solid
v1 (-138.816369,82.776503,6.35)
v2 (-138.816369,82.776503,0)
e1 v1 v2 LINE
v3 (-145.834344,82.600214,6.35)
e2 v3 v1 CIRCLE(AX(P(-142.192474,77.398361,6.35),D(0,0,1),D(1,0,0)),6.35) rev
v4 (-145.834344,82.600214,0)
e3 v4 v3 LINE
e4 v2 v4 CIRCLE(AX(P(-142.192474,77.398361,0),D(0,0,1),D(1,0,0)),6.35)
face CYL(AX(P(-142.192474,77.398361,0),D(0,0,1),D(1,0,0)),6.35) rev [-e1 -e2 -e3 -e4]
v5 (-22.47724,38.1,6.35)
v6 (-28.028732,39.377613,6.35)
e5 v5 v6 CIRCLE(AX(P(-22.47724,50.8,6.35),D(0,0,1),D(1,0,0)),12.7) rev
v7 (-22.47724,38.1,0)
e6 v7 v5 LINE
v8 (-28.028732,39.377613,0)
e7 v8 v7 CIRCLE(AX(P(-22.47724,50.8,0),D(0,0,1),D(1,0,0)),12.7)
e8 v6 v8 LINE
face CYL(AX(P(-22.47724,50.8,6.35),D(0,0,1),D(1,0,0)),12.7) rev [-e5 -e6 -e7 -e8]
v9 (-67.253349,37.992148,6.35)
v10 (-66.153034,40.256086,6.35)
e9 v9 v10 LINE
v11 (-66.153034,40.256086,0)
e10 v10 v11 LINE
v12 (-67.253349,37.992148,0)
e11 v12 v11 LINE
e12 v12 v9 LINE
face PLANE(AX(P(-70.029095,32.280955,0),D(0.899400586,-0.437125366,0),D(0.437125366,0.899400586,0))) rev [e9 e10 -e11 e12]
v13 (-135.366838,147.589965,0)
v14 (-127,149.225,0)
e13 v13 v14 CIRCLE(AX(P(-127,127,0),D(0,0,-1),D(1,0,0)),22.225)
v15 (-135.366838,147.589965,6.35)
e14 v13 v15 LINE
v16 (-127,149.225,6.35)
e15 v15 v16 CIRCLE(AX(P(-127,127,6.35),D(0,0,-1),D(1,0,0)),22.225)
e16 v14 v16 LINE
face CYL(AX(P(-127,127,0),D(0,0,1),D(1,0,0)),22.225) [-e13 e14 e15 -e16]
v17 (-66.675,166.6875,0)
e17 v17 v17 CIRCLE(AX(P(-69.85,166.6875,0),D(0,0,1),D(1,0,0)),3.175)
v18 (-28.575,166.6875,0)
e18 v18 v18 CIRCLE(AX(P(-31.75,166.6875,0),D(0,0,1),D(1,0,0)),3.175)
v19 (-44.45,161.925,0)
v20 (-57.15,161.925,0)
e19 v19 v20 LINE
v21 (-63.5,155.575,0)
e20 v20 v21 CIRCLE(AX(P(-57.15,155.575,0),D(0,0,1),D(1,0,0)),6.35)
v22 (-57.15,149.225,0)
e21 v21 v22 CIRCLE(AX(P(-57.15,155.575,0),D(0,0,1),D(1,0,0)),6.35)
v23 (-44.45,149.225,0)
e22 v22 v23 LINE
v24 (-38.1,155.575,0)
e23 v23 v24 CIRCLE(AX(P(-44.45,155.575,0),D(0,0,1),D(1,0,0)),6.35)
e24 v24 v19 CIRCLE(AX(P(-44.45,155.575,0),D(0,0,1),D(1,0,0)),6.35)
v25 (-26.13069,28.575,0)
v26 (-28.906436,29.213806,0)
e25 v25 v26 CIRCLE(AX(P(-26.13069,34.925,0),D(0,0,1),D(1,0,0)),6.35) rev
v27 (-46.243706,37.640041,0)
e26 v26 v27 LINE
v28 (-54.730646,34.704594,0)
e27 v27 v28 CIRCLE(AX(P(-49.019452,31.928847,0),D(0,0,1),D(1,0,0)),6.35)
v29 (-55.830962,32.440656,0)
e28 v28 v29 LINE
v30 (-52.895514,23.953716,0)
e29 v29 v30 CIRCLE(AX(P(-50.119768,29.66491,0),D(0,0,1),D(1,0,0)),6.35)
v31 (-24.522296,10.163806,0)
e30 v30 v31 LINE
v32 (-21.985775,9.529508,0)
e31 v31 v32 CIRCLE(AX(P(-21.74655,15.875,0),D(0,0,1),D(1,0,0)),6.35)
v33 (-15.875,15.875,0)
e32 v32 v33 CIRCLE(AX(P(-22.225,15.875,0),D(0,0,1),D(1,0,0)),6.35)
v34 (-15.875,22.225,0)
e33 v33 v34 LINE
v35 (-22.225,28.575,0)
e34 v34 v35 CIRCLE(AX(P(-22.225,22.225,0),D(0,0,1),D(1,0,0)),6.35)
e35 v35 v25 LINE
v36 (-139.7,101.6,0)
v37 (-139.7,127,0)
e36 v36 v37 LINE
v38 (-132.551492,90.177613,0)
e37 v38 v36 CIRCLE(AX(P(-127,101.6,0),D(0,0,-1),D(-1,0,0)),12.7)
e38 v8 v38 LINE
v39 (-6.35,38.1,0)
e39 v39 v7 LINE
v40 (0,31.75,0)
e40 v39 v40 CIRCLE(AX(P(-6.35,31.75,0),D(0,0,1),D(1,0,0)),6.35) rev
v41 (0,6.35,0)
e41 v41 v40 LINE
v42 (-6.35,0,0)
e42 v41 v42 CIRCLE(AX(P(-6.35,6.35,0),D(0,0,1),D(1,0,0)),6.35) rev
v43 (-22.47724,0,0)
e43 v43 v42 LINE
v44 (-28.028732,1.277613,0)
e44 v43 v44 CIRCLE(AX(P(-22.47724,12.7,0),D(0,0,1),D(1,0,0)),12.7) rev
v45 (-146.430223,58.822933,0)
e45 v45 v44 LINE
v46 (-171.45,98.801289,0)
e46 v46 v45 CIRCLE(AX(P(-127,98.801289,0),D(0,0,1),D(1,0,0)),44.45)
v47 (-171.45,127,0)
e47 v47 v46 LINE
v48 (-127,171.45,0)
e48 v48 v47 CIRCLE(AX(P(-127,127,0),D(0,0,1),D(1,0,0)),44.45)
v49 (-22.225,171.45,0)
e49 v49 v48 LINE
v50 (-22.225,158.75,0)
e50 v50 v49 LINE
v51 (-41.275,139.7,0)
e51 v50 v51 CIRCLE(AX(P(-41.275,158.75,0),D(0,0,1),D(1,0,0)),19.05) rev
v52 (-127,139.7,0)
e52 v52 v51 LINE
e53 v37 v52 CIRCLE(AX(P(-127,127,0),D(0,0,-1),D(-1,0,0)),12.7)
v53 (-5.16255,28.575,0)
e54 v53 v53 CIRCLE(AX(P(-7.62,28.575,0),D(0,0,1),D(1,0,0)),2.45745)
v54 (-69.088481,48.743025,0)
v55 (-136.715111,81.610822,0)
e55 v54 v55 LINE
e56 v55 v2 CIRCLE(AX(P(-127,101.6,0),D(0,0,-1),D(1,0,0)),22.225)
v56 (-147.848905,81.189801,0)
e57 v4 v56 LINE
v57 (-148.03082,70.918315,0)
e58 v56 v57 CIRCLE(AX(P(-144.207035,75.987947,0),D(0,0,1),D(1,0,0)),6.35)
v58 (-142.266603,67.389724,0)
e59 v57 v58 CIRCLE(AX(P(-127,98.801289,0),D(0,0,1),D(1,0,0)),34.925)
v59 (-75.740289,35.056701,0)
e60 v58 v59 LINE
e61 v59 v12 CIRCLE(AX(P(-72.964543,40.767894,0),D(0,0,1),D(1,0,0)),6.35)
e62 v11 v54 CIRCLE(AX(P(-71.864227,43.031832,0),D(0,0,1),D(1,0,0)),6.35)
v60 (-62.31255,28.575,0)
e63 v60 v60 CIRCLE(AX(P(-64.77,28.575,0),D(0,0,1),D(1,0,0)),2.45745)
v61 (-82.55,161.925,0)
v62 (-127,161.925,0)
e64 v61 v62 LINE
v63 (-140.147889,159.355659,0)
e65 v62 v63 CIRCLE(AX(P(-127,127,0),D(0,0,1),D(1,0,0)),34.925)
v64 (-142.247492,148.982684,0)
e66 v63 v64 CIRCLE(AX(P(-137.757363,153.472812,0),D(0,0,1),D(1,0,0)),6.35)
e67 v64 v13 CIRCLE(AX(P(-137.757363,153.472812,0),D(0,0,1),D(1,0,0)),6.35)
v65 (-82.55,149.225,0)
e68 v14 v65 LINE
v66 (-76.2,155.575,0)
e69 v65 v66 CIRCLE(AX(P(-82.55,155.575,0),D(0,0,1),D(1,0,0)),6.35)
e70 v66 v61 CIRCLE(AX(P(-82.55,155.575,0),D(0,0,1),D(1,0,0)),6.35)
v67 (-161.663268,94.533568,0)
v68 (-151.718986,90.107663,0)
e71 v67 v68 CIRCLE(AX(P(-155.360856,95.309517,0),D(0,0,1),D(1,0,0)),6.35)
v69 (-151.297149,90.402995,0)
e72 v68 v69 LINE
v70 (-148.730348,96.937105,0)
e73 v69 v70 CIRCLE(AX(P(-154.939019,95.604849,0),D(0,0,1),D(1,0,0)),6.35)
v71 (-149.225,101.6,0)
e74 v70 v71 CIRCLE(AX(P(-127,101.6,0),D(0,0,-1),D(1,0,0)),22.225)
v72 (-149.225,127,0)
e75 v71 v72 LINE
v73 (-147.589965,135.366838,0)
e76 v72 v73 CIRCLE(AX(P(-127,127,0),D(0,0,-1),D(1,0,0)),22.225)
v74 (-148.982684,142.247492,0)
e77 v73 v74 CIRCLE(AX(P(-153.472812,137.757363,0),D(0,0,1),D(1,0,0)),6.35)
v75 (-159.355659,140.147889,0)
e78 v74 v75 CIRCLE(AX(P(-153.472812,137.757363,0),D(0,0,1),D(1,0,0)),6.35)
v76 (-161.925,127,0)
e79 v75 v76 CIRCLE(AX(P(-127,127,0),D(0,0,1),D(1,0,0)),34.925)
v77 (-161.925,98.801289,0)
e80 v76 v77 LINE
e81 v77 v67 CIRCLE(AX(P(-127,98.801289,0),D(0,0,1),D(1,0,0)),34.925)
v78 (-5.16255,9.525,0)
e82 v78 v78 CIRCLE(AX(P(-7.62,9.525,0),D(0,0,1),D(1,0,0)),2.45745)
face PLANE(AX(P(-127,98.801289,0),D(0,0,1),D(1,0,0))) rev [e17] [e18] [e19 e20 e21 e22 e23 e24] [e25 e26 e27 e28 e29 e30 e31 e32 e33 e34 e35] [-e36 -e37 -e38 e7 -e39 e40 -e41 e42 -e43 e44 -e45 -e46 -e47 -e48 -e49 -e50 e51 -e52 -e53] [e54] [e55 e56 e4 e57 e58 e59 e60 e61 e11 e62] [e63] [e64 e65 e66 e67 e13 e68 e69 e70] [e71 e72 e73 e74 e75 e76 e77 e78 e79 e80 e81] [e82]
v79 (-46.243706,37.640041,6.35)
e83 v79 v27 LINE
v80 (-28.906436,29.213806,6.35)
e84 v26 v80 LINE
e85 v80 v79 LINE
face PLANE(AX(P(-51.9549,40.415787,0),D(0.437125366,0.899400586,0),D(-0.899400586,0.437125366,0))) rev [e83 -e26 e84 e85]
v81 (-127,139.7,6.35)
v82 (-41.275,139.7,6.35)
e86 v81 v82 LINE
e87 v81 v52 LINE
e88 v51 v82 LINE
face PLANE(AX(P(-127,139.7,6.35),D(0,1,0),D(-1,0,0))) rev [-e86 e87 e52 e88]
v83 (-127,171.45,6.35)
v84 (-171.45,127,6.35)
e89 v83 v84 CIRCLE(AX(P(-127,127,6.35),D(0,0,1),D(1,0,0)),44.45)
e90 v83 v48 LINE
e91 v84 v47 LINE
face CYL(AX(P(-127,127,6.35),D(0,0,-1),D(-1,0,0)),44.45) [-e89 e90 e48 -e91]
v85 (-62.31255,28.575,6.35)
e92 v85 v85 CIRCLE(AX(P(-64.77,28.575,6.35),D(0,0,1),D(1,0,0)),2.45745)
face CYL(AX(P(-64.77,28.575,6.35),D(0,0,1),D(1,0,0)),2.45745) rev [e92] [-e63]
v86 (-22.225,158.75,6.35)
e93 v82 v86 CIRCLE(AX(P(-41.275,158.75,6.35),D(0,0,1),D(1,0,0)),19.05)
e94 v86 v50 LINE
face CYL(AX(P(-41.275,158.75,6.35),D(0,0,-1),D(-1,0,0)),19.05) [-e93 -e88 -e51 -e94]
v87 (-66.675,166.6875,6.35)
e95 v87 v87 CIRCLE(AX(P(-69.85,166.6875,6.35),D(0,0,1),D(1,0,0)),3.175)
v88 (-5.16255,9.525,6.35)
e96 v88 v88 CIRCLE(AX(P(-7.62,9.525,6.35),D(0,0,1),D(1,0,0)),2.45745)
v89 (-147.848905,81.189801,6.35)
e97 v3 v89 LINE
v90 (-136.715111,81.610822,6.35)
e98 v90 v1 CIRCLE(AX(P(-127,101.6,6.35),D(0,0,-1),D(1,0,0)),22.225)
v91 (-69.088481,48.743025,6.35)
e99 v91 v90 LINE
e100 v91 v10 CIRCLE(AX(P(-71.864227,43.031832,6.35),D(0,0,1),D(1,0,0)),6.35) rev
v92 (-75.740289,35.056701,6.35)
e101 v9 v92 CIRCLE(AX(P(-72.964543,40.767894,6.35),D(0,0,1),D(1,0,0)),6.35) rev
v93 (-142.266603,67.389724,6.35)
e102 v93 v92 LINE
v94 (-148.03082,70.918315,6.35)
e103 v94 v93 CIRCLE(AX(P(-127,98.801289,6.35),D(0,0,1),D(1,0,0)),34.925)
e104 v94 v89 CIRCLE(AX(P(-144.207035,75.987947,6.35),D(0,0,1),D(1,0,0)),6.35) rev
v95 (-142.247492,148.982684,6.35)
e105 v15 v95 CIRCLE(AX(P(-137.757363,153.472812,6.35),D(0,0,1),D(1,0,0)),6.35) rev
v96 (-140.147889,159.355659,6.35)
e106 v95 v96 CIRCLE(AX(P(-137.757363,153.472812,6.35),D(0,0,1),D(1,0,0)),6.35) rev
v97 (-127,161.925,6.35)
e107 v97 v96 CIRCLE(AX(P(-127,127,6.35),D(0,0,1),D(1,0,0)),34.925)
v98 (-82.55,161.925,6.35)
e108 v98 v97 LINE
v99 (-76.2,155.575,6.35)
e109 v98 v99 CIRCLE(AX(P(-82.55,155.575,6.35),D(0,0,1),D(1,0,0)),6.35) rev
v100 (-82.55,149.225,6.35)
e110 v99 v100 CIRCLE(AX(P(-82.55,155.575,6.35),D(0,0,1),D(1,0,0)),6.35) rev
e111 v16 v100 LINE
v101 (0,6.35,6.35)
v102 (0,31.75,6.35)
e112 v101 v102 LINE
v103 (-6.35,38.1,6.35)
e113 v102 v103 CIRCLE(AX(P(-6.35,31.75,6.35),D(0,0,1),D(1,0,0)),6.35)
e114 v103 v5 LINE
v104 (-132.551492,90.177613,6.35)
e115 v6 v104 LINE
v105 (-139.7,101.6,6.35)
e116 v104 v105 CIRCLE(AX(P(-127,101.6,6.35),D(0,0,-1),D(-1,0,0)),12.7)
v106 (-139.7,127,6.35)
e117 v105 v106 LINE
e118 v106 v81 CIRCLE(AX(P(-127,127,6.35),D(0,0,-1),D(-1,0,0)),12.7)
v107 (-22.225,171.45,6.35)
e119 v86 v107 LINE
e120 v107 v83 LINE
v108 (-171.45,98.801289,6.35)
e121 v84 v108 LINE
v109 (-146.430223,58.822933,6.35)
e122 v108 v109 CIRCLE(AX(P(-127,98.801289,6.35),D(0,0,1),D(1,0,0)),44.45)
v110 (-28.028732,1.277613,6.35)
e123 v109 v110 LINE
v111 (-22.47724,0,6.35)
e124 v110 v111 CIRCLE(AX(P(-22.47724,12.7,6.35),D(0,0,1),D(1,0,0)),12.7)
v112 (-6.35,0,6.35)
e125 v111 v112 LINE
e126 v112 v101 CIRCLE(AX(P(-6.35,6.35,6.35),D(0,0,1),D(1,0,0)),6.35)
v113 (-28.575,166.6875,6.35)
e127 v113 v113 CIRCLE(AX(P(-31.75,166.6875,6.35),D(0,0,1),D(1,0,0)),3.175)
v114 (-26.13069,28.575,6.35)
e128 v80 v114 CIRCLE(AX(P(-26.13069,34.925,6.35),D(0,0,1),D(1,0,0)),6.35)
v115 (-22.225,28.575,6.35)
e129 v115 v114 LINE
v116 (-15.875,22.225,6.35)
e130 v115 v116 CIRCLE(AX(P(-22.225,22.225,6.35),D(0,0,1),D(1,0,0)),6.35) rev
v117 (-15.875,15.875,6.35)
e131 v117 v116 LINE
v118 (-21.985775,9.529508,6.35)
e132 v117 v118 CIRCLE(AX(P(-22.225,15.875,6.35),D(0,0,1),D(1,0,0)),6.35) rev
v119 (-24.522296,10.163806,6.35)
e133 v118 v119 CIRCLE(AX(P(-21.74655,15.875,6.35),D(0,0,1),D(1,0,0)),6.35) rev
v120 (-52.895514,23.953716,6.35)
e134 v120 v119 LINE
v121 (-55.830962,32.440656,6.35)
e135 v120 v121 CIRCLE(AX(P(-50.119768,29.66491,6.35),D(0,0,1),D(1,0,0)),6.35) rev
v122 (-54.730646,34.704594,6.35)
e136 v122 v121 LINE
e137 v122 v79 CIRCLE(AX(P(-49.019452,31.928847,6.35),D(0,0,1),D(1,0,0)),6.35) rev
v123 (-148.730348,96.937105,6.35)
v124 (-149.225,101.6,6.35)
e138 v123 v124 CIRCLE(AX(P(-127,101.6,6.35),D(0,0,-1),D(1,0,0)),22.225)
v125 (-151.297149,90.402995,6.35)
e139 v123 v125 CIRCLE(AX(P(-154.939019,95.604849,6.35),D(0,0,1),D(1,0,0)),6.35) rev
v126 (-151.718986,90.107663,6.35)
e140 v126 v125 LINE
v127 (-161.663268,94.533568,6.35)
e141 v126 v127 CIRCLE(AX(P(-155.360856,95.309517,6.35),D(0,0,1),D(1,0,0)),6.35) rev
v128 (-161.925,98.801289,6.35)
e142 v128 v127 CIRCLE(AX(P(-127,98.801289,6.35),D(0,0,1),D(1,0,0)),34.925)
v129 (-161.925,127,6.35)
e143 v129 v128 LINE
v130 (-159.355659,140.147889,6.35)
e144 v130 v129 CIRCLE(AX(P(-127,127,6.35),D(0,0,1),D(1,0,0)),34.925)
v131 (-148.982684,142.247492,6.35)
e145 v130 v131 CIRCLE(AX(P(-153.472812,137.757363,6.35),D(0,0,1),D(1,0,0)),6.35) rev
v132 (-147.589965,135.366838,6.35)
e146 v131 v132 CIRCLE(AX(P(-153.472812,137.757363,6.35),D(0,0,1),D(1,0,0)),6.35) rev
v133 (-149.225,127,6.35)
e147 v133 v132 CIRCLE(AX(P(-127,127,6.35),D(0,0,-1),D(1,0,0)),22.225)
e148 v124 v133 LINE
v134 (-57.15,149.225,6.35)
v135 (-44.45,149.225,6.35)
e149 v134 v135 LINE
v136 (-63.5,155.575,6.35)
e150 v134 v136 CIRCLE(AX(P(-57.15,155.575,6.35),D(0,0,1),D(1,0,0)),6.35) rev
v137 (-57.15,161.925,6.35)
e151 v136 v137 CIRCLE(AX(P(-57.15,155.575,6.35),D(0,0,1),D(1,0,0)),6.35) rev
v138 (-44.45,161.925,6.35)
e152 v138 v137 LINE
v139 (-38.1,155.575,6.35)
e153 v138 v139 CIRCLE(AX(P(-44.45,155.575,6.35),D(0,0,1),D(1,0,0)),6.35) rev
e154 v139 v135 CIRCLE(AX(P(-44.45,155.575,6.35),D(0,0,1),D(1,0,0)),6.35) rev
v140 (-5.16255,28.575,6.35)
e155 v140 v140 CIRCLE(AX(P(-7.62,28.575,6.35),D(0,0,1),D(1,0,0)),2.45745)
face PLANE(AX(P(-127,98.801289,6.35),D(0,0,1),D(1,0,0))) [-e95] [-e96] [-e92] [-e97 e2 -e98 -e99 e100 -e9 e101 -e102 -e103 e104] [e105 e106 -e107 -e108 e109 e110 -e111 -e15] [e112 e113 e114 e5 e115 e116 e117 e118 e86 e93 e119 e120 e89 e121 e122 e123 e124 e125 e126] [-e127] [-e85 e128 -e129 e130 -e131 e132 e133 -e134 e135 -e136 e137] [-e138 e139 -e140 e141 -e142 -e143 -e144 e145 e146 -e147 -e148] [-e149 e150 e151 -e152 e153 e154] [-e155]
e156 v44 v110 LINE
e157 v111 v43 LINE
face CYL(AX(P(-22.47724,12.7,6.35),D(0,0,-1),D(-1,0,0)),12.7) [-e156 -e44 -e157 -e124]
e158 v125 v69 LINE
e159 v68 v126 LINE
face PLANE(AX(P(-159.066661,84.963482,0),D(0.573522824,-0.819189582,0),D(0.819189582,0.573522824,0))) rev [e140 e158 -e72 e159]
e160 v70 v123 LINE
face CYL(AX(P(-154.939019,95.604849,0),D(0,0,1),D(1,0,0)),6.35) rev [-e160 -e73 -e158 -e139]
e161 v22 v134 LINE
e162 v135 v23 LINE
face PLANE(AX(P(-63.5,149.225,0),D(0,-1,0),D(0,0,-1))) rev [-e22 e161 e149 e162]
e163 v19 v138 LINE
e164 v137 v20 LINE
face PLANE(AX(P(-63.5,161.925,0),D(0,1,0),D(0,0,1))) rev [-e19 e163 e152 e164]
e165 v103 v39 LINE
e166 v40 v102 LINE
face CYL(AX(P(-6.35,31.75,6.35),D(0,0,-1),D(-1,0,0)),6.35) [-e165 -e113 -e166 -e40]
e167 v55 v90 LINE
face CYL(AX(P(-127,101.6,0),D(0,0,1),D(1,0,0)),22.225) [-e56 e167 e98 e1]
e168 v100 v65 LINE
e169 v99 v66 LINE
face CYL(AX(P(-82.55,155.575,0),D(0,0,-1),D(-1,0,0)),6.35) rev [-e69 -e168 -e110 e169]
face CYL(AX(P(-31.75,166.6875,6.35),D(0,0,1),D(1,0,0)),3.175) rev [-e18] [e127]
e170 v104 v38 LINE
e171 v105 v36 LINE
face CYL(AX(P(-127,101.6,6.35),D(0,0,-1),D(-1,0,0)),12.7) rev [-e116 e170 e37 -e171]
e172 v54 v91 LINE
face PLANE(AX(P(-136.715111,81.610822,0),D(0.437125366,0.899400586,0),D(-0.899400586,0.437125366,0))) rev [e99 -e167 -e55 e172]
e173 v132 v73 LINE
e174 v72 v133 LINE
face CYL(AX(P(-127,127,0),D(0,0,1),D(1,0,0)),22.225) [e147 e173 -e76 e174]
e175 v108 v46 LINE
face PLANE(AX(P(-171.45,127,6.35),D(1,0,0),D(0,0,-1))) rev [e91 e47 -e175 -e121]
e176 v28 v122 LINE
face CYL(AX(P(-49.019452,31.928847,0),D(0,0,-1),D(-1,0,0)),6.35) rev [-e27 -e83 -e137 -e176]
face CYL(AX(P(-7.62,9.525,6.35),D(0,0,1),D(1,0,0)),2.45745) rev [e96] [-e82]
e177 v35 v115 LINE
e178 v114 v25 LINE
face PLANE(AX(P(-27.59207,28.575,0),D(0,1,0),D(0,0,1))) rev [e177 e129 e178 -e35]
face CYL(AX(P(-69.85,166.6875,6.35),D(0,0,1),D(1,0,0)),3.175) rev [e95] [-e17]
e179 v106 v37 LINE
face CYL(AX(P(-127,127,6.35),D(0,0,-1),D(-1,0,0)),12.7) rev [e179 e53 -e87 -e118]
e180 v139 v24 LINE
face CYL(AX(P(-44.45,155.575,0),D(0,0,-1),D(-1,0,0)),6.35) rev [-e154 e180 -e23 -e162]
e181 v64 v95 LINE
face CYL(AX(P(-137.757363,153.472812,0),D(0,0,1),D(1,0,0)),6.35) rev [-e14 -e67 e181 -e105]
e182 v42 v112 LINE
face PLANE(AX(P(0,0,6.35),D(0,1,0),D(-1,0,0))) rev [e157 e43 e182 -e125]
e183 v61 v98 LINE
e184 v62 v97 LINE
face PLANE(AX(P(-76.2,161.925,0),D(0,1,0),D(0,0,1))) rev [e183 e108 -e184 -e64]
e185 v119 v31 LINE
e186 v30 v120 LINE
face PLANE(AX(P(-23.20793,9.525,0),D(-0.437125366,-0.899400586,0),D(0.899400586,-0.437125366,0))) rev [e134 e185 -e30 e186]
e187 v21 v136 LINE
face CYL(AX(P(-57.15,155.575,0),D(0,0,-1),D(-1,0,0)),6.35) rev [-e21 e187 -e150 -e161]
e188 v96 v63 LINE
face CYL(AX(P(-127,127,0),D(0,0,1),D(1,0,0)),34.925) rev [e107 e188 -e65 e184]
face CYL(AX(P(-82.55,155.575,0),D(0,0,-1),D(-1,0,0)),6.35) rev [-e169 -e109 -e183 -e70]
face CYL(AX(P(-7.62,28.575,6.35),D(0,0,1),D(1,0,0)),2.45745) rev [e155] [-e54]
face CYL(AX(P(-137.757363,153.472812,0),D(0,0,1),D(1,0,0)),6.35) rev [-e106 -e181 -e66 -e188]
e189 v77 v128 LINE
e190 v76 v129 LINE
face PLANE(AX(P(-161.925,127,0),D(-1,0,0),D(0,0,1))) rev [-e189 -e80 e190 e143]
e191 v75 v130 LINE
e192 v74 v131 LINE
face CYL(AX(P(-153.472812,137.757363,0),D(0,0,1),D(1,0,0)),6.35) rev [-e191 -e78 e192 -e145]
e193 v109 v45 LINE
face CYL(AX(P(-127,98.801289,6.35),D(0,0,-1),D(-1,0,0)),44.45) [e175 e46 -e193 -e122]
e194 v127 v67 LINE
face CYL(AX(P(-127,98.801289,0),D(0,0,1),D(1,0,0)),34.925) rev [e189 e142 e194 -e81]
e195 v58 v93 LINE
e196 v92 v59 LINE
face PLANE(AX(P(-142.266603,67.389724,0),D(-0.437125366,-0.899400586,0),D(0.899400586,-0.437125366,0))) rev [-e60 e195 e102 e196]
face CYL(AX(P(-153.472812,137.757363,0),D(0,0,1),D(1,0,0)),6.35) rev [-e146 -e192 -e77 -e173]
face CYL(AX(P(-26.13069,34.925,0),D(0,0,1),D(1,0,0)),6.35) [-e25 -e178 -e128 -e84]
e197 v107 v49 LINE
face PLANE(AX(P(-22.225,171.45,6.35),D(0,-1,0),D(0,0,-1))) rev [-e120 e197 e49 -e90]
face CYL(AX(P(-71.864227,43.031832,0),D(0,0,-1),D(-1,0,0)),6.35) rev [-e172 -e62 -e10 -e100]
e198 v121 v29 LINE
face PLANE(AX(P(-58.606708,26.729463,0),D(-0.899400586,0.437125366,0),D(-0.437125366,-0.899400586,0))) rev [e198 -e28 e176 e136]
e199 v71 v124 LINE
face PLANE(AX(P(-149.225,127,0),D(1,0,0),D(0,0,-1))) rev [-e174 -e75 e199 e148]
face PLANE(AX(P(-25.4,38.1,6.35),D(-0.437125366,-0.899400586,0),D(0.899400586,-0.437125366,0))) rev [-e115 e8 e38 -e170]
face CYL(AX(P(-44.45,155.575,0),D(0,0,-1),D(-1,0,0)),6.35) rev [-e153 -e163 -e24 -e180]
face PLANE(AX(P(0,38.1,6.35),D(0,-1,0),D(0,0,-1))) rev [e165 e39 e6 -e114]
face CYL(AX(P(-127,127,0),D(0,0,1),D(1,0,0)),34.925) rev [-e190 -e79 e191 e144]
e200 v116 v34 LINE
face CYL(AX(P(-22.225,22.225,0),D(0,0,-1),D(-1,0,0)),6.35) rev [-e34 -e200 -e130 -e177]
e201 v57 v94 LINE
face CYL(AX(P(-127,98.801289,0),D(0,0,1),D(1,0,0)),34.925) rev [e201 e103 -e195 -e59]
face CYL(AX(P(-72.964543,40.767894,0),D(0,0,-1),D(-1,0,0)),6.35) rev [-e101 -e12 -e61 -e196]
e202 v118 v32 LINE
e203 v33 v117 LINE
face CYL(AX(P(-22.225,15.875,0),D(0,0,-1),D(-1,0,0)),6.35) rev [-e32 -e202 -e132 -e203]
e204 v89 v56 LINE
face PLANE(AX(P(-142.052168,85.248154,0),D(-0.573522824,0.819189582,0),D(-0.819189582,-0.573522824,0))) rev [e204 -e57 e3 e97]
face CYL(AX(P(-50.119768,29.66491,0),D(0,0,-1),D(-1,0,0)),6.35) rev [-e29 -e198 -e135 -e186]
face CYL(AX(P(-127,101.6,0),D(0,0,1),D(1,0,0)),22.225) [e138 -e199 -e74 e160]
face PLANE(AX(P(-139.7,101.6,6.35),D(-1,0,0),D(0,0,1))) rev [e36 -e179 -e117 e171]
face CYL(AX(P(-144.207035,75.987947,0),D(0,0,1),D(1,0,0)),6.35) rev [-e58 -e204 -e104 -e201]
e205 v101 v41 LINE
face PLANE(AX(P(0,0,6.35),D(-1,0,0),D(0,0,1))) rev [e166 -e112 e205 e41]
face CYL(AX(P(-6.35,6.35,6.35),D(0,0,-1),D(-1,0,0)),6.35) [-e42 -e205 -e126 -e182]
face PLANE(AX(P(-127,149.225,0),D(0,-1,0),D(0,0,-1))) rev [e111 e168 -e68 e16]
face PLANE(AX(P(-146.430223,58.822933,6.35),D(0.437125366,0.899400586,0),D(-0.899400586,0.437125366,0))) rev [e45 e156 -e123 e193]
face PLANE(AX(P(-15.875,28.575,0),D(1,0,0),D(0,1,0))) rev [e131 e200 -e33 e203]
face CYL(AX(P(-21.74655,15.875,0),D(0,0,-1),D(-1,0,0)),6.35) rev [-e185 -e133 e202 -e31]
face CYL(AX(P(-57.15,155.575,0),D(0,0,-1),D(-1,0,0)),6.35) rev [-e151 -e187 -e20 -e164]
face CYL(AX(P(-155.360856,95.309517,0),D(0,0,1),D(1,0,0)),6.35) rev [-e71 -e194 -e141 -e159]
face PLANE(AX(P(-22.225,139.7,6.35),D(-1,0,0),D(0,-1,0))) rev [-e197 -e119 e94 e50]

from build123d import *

# Parameters (mm, degrees)
BOSS_EXTRUDE1_DEPTH              = 6.35
F_1_4_0_25_DIAMETER_HOLE1_D      = 6.35
F_1_4_0_25_DIAMETER_HOLE1_DEPTH  = 9.652
F_1_4_0_25_DIAMETER_HOLE1_TIP    = 1.9077324654125039
F_10_0_1935_DIAMETER_HOLE1_D     = 4.9149
F_10_0_1935_DIAMETER_HOLE1_DEPTH = 9.652
F_10_0_1935_DIAMETER_HOLE1_TIP   = 1.476584928229278
FILLET1_R                        = 12.7
FILLET2_R                        = 6.35
SKETCH8_W                        = 25.40000000000005
SKETCH8_H                        = 12.699999999999989
CUT_EXTRUDE3_DEPTH               = 243.55005153576033
FILLET4_R                        = 6.35
FILLET5_R                        = 19.05


with BuildPart() as part:
    # Sketch1 → Boss-Extrude1 (new body)
    with BuildSketch(Plane.XY):
        with BuildLine():
            Line((0, 0), (0, 38.1))
            Line((0, 38.1), (-25.400000000000002, 38.1))
            Line((-25.400000000000002, 38.1), (-132.55149215165815, 90.17761255734695))
            ThreePointArc((-132.55149215165815, 90.17761255734695), (-137.76554574385477, 94.862565411303), (-139.70000000000002, 101.6))
            Line((-139.70000000000002, 101.6), (-139.70000000000002, 127))
            ThreePointArc((-139.70000000000002, 127), (-135.98025612106917, 135.98025612106917), (-127, 139.69999999999996))
            Line((-127, 139.69999999999996), (-22.22499999999998, 139.7))
            Line((-22.22499999999998, 139.7), (-22.224999999999984, 171.45))
            Line((-22.224999999999984, 171.45), (-127, 171.45))
            ThreePointArc((-127, 171.45), (-158.430896423742, 158.43089642374204), (-171.45, 127))
            Line((-171.45, 127), (-171.45, 98.80128898397304))
            ThreePointArc((-171.45, 98.80128898397304), (-164.67941010349165, 75.22026792353354), (-146.43022253080355, 58.82293293468738))
            Line((-146.43022253080355, 58.82293293468738), (-25.4, -3.11e-15))
            Line((-25.4, -3.11e-15), (0, 0))
        make_face()
    extrude(amount=BOSS_EXTRUDE1_DEPTH)

    # 1/4 (0.25) Diameter Hole1
    with Locations(Plane.XY.offset(6.35)):
        with Locations((-69.85, 166.6875), (-31.75, 166.6875)):
            Hole(F_1_4_0_25_DIAMETER_HOLE1_D / 2, depth=F_1_4_0_25_DIAMETER_HOLE1_DEPTH)
            with Locations((0, 0, -(F_1_4_0_25_DIAMETER_HOLE1_DEPTH + F_1_4_0_25_DIAMETER_HOLE1_TIP / 2))):  # 118° drill point
                Cone(0, F_1_4_0_25_DIAMETER_HOLE1_D / 2, F_1_4_0_25_DIAMETER_HOLE1_TIP, mode=Mode.SUBTRACT)

    # #10 (0.1935) Diameter Hole1
    with Locations(Plane.XY.offset(6.35)):
        with Locations((-7.62, 28.575), (-7.62, 9.525), (-64.77, 28.575)):
            Hole(F_10_0_1935_DIAMETER_HOLE1_D / 2, depth=F_10_0_1935_DIAMETER_HOLE1_DEPTH)
            with Locations((0, 0, -(F_10_0_1935_DIAMETER_HOLE1_DEPTH + F_10_0_1935_DIAMETER_HOLE1_TIP / 2))):  # 118° drill point
                Cone(0, F_10_0_1935_DIAMETER_HOLE1_D / 2, F_10_0_1935_DIAMETER_HOLE1_TIP, mode=Mode.SUBTRACT)

    # Fillet1
    fillet1_edges = [part.edges().sort_by_distance(p)[0] for p in [
        (-25.4, -3.11e-15, 3.175),
        (-25.400000000000002, 38.1, 3.175),
    ]]
    fillet(fillet1_edges, radius=FILLET1_R)

    # Fillet2
    fillet2_edges = [part.edges().sort_by_distance(p)[0] for p in [
        (0, 38.1, 3.175),
        (0, 0, 3.175),
    ]]
    fillet(fillet2_edges, radius=FILLET2_R)

    # Sketch8 → Cut-Extrude3 (cut, through all)
    with BuildSketch(Plane.XY.offset(6.35)):
        with BuildLine():
            Line((-76.19999999999997, 161.92499999999998), (-127, 161.92499999999998))
            ThreePointArc((-127, 161.92499999999998), (-138.12882691189947, 160.1044534249545), (-148.09742202888222, 154.83261411968402))
            Line((-148.09742202888222, 154.83261411968402), (-138.98279839171374, 145.71799048251555))
            ThreePointArc((-138.98279839171374, 145.71799048251555), (-133.24272722958852, 148.33023632632685), (-127, 149.225))
            Line((-127, 149.225), (-76.19999999999997, 149.225))
            Line((-76.19999999999997, 149.225), (-76.19999999999997, 161.92499999999998))
        make_face()
        with BuildLine():
            Line((-161.925, 127), (-161.925, 98.80128898397304))
            ThreePointArc((-161.925, 98.80128898397304), (-161.20295128798153, 91.73632272842997), (-159.06666080504155, 84.96348244484211))
            Line((-159.06666080504155, 84.96348244484211), (-147.51497280949854, 93.050934809844))
            ThreePointArc((-147.51497280949854, 93.050934809844), (-148.79330052666535, 97.24079397659989), (-149.225, 101.6))
            Line((-149.225, 101.6), (-149.225, 127))
            ThreePointArc((-149.225, 127), (-148.33023632632688, 133.2427272295885), (-145.71799048251557, 138.98279839171371))
            Line((-145.71799048251557, 138.98279839171371), (-154.83261411968402, 148.09742202888222))
            ThreePointArc((-154.83261411968402, 148.09742202888222), (-160.1044534249545, 138.12882691189947), (-161.925, 127))
        make_face()
        with BuildLine():
            Line((-142.05216791273205, 85.24815404527915), (-154.12206516409194, 76.79789819448892))
            ThreePointArc((-154.12206516409194, 76.79789819448892), (-148.7100954330638, 71.44388813361326), (-142.2666034170599, 67.38972351667718))
            Line((-142.2666034170599, 67.38972351667718), (-70.02909509590478, 32.28095466133805))
            Line((-70.02909509590478, 32.28095466133805), (-63.37728743967065, 45.967279376904486))
            Line((-63.37728743967065, 45.967279376904486), (-136.7151112654018, 81.61082197535714))
            ThreePointArc((-136.7151112654018, 81.61082197535714), (-139.51647217144776, 83.23458278771281), (-142.05216791273205, 85.24815404527915))
        make_face()
        Polygon((-51.95489999701758, 40.415787225246326), (-27.59207003743942, 28.574999999999996), (-15.875, 28.574999999999996), (-15.874999999999996, 9.525000000000002), (-23.20792996256074, 9.524999999999999), (-58.6067076532517, 26.729462509679877), align=None)
        with Locations((-50.79999999999999, 155.575)):
            Rectangle(SKETCH8_W, SKETCH8_H)
    extrude(amount=-CUT_EXTRUDE3_DEPTH, mode=Mode.SUBTRACT)

    # Fillet4
    # the kernel refuses this fillet: 6.35 mm, written as the material it adds along each edge
    with BuildSketch(Plane(origin=(-23.20792996256074, 9.524999999999999, 6.35), x_dir=(-0.899400586035673, 0.43712536627229515, 0), z_dir=(0, 0, -1))) as fillet4_piece_1:
        with BuildLine():
            CenterArc((FILLET4_R * 0.230138586608, FILLET4_R), FILLET4_R, 244.0793884634155, 25.920611536584488)
            Line((-FILLET4_R * 0.206986779664, FILLET4_R * 0.100599413964), (0, 0))
            Line((0, 0), (FILLET4_R * 0.230138586608, 1e-17))
        make_face()
    extrude(amount=6.35)
    with BuildSketch(Plane(origin=(-15.874999999999996, 9.525000000000002, 6.35), x_dir=(-1, -5.6e-16, 0), z_dir=(0, 0, -1))) as fillet4_piece_2:
        with BuildLine():
            CenterArc((FILLET4_R, FILLET4_R), FILLET4_R, 180, 90)
            Line((-1.78e-15, FILLET4_R), (0, 0))
            Line((0, 0), (FILLET4_R, 0))
        make_face()
    extrude(amount=6.35)
    with BuildSketch(Plane(origin=(-15.875, 28.574999999999996, 6.35), x_dir=(2.8e-16, -1, 0), z_dir=(0, 0, -1))) as fillet4_piece_3:
        with BuildLine():
            CenterArc((FILLET4_R, FILLET4_R), FILLET4_R, 180, 90)
            Line((-1.78e-15, FILLET4_R), (0, 0))
            Line((0, 0), (FILLET4_R, 0))
        make_face()
    extrude(amount=6.35)
    with BuildSketch(Plane(origin=(-58.6067076532517, 26.729462509679877, 6.35), x_dir=(0.43712536627229537, 0.8994005860356729, 0), z_dir=(0, 0, -1))) as fillet4_piece_4:
        with BuildLine():
            CenterArc((FILLET4_R, FILLET4_R), FILLET4_R, 180.00000000000009, 89.99999999999989)
            Line((3.06e-15, FILLET4_R), (0, 0))
            Line((0, 0), (FILLET4_R, -1.1e-16))
        make_face()
    extrude(amount=6.35)
    with BuildSketch(Plane(origin=(-51.95489999701758, 40.415787225246326, 6.35), x_dir=(-0.43712536627229487, -0.899400586035673, 0), z_dir=(0, 0, -1))) as fillet4_piece_5:
        with BuildLine():
            CenterArc((FILLET4_R, -FILLET4_R), FILLET4_R, 90, 90.00000000000011)
            Line((6.47e-15, -FILLET4_R), (0, 0))
            Line((0, 0), (FILLET4_R, 9e-17))
        make_face()
    extrude(amount=6.35)
    with BuildSketch(Plane(origin=(-63.37728743967065, 45.967279376904486, 6.35), x_dir=(-0.43712536627229537, -0.8994005860356729, 0), z_dir=(0, 0, -1))) as fillet4_piece_6:
        with BuildLine():
            CenterArc((FILLET4_R, FILLET4_R), FILLET4_R, 179.9999999999999, 90.00000000000011)
            Line((6e-15, FILLET4_R), (0, 0))
            Line((0, 0), (FILLET4_R, -1.1e-16))
        make_face()
    extrude(amount=6.35)
    with BuildSketch(Plane(origin=(-70.02909509590478, 32.28095466133805, 6.35), x_dir=(-0.8994005860356724, 0.4371253662722963, 0), z_dir=(0, 0, -1))) as fillet4_piece_7:
        with BuildLine():
            CenterArc((FILLET4_R, FILLET4_R), FILLET4_R, 179.99999999999994, 90)
            Line((6.38e-15, FILLET4_R), (0, 0))
            Line((0, 0), (FILLET4_R, 5e-17))
        make_face()
    extrude(amount=6.35)
    with BuildSketch(Plane(origin=(-154.12206516409194, 76.79789819448892, 6.35), x_dir=(0.819189581581614, 0.57352282380751, 0), z_dir=(0, 0, -1))) as fillet4_piece_8:
        with BuildLine():
            CenterArc((7.657764037607667, 6.350000000000007), FILLET4_R, 162.02178891468273, 107.97821108531724)
            ThreePointArc((1.6178093721145603, 8.3099611319585), (0.5561766270605806, 4.204182459459689), (0, 0))
            Line((0, 0), (7.657764037607664, -3.7e-16))
        make_face()
    extrude(amount=6.35)
    with BuildSketch(Plane(origin=(-142.05216791273205, 85.24815404527915, 6.35), x_dir=(-0.819189581581615, -0.5735228238075083, 0), z_dir=(0, 0, -1))) as fillet4_piece_9:
        with BuildLine():
            CenterArc((4.61697327270199, -6.350000000000006), FILLET4_R, 89.99999999999986, 67.11461952384218)
            ThreePointArc((-1.2331843436193552, -3.880555555555626), (-0.5275365740025959, -1.9685783567426014), (0, 0))
            Line((0, 0), (4.616973272702006, 1e-17))
        make_face()
    extrude(amount=6.35)
    with BuildSketch(Plane(origin=(-147.51497280949854, 93.050934809844, 6.35), x_dir=(-0.8191895815816139, -0.57352282380751, 0), z_dir=(0, 0, -1))) as fillet4_piece_10:
        with BuildLine():
            CenterArc((4.616973272701946, 6.350000000000006), FILLET4_R, 202.885380476159, 67.11461952384093)
            ThreePointArc((-1.2331843436193741, 3.880555555555511), (-0.5275365740026128, 1.9685783567425768), (0, 0))
            Line((0, 0), (4.616973272701943, 4e-17))
        make_face()
    extrude(amount=6.35)
    with BuildSketch(Plane(origin=(-159.06666080504155, 84.96348244484211, 6.35), x_dir=(-0.261857934927054, 0.9651064303566413, 0), z_dir=(0, 0, -1))) as fillet4_piece_11:
        with BuildLine():
            CenterArc((9.014629990057857, 6.285687270412339), FILLET4_R, 160.18408388914497, 117.9773499711298)
            Line((3.0406348569099713, 8.438332654381856), (0, 0))
            ThreePointArc((0, 0), (4.958046494531804, -0.35372001273222614), (9.916092989063605, -6e-17))
        make_face()
    extrude(amount=6.35)
    with BuildSketch(Plane(origin=(-154.83261411968402, 148.09742202888222, 6.35), x_dir=(0.7071067811865458, -0.7071067811865492, 0), z_dir=(0, 0, -1))) as fillet4_piece_12:
        with BuildLine():
            CenterArc((8.273051090908108, 6.350000000000015), FILLET4_R, 157.11461952384028, 112.88538047615978)
            ThreePointArc((2.4228934745868353, 8.819444444444574), (0.9214926410236765, 4.489378927608573), (0, 0))
            Line((0, 0), (8.273051090908114, -9e-17))
        make_face()
    extrude(amount=6.35)
    with BuildSketch(Plane(origin=(-145.71799048251557, 138.98279839171371, 6.35), x_dir=(-0.45974256906919553, -0.8880522339286445, 0), z_dir=(0, 0, -1))) as fillet4_piece_13:
        with BuildLine():
            CenterArc((4.653471653105217, 6.323301651399347), FILLET4_R, 197.6295027961731, 67.11461952384201)
            Line((-1.3982996116780777, 4.400136406615789), (0, 0))
            ThreePointArc((0, 0), (2.0358938482335205, 0.09344422010227843), (4.071787696467069, -1.1e-16))
        make_face()
    extrude(amount=6.35)
    with BuildSketch(Plane(origin=(-138.98279839171374, 145.71799048251555, 6.35), x_dir=(-0.7071067811865475, 0.7071067811865475, 0), z_dir=(0, 0, -1))) as fillet4_piece_14:
        with BuildLine():
            CenterArc((4.616973272701996, 6.349999999999994), FILLET4_R, 202.88538047615842, 67.11461952384161)
            ThreePointArc((-1.2331843436193233, 3.88055555555557), (-0.5275365740025925, 1.9685783567425814), (0, 0))
            Line((0, 0), (4.616973272701996, 6e-17))
        make_face()
    extrude(amount=6.35)
    with BuildSketch(Plane(origin=(-148.09742202888222, 154.83261411968402, 6.35), x_dir=(0.869162224980119, 0.4945270737458255, 0), z_dir=(0, 0, -1))) as fillet4_piece_15:
        with BuildLine():
            CenterArc((8.314729193934072, 6.29532785360028), FILLET4_R, 164.63856988037904, 112.88538047615813)
            Line((2.1915896078739827, 7.977487658619955), (0, 0))
            ThreePointArc((0, 0), (4.573101056663757, -0.30069680519851316), (9.14620211332749, -1.3e-16))
        make_face()
    extrude(amount=6.35)
    with BuildSketch(Plane(origin=(-76.19999999999997, 149.225, 6.35), x_dir=(-1, 0, 0), z_dir=(0, 0, -1))) as fillet4_piece_16:
        with BuildLine():
            CenterArc((FILLET4_R, FILLET4_R), FILLET4_R, 180, 90)
            Line((0, FILLET4_R), (0, 0))
            Line((0, 0), (FILLET4_R, 0))
        make_face()
    extrude(amount=6.35)
    with BuildSketch(Plane(origin=(-76.19999999999997, 161.92499999999998, 6.35), x_dir=(-1, 0, 0), z_dir=(0, 0, -1))) as fillet4_piece_17:
        with BuildLine():
            CenterArc((FILLET4_R, -FILLET4_R), FILLET4_R, 90, 90)
            Line((0, -FILLET4_R), (0, 0))
            Line((0, 0), (FILLET4_R, 0))
        make_face()
    extrude(amount=6.35)
    with BuildSketch(Plane(origin=(-38.099999999999966, 149.225, 6.35), x_dir=(-1, 0, 0), z_dir=(0, 0, -1))) as fillet4_piece_18:
        with BuildLine():
            CenterArc((FILLET4_R, FILLET4_R), FILLET4_R, 180, 90)
            Line((0, FILLET4_R), (0, 0))
            Line((0, 0), (FILLET4_R, 0))
        make_face()
    extrude(amount=6.35)
    with BuildSketch(Plane(origin=(-38.099999999999966, 161.92499999999998, 6.35), x_dir=(0, -1, 0), z_dir=(0, 0, -1)), Plane(origin=(-63.500000000000014, 149.225, 6.35), x_dir=(0, 1, 0), z_dir=(0, 0, -1))) as fillet4_piece_19:
        with BuildLine():
            CenterArc((FILLET4_R, FILLET4_R), FILLET4_R, 180, 90)
            Line((0, FILLET4_R), (0, 0))
            Line((0, 0), (FILLET4_R, 0))
        make_face()
    extrude(amount=6.35)
    with BuildSketch(Plane(origin=(-63.500000000000014, 161.92499999999998, 6.35), x_dir=(0, -1, 0), z_dir=(0, 0, -1))) as fillet4_piece_20:
        with BuildLine():
            CenterArc((FILLET4_R, -FILLET4_R), FILLET4_R, 90, 90)
            Line((0, -FILLET4_R), (0, 0))
            Line((0, 0), (FILLET4_R, 0))
        make_face()
    extrude(amount=6.35)
    # the kernel refuses this fillet: 6.35 mm, written as the material it takes off along each edge
    with BuildSketch(Plane(origin=(-27.592070037439417, 28.574999999999996, 10.003450062398983), x_dir=(1, 0, 0), z_dir=(0, 0, -1))) as fillet4_2_piece_1:
        with BuildLine():
            CenterArc((FILLET4_R * 0.230138586608, -FILLET4_R), FILLET4_R, 90, 25.920611536584403)
            Line((-FILLET4_R * 0.206986779664, -FILLET4_R * 0.100599413964), (0, 0))
            Line((0, 0), (FILLET4_R * 0.230138586608, 0))
        make_face()
    extrude(amount=13.656900124797966, mode=Mode.SUBTRACT)

    # Fillet5
    fillet5_edges = [part.edges().sort_by_distance(p)[0] for p in [
        (-22.22499999999998, 139.7, 3.175),
    ]]
    fillet(fillet5_edges, radius=FILLET5_R)


solid = part.part
